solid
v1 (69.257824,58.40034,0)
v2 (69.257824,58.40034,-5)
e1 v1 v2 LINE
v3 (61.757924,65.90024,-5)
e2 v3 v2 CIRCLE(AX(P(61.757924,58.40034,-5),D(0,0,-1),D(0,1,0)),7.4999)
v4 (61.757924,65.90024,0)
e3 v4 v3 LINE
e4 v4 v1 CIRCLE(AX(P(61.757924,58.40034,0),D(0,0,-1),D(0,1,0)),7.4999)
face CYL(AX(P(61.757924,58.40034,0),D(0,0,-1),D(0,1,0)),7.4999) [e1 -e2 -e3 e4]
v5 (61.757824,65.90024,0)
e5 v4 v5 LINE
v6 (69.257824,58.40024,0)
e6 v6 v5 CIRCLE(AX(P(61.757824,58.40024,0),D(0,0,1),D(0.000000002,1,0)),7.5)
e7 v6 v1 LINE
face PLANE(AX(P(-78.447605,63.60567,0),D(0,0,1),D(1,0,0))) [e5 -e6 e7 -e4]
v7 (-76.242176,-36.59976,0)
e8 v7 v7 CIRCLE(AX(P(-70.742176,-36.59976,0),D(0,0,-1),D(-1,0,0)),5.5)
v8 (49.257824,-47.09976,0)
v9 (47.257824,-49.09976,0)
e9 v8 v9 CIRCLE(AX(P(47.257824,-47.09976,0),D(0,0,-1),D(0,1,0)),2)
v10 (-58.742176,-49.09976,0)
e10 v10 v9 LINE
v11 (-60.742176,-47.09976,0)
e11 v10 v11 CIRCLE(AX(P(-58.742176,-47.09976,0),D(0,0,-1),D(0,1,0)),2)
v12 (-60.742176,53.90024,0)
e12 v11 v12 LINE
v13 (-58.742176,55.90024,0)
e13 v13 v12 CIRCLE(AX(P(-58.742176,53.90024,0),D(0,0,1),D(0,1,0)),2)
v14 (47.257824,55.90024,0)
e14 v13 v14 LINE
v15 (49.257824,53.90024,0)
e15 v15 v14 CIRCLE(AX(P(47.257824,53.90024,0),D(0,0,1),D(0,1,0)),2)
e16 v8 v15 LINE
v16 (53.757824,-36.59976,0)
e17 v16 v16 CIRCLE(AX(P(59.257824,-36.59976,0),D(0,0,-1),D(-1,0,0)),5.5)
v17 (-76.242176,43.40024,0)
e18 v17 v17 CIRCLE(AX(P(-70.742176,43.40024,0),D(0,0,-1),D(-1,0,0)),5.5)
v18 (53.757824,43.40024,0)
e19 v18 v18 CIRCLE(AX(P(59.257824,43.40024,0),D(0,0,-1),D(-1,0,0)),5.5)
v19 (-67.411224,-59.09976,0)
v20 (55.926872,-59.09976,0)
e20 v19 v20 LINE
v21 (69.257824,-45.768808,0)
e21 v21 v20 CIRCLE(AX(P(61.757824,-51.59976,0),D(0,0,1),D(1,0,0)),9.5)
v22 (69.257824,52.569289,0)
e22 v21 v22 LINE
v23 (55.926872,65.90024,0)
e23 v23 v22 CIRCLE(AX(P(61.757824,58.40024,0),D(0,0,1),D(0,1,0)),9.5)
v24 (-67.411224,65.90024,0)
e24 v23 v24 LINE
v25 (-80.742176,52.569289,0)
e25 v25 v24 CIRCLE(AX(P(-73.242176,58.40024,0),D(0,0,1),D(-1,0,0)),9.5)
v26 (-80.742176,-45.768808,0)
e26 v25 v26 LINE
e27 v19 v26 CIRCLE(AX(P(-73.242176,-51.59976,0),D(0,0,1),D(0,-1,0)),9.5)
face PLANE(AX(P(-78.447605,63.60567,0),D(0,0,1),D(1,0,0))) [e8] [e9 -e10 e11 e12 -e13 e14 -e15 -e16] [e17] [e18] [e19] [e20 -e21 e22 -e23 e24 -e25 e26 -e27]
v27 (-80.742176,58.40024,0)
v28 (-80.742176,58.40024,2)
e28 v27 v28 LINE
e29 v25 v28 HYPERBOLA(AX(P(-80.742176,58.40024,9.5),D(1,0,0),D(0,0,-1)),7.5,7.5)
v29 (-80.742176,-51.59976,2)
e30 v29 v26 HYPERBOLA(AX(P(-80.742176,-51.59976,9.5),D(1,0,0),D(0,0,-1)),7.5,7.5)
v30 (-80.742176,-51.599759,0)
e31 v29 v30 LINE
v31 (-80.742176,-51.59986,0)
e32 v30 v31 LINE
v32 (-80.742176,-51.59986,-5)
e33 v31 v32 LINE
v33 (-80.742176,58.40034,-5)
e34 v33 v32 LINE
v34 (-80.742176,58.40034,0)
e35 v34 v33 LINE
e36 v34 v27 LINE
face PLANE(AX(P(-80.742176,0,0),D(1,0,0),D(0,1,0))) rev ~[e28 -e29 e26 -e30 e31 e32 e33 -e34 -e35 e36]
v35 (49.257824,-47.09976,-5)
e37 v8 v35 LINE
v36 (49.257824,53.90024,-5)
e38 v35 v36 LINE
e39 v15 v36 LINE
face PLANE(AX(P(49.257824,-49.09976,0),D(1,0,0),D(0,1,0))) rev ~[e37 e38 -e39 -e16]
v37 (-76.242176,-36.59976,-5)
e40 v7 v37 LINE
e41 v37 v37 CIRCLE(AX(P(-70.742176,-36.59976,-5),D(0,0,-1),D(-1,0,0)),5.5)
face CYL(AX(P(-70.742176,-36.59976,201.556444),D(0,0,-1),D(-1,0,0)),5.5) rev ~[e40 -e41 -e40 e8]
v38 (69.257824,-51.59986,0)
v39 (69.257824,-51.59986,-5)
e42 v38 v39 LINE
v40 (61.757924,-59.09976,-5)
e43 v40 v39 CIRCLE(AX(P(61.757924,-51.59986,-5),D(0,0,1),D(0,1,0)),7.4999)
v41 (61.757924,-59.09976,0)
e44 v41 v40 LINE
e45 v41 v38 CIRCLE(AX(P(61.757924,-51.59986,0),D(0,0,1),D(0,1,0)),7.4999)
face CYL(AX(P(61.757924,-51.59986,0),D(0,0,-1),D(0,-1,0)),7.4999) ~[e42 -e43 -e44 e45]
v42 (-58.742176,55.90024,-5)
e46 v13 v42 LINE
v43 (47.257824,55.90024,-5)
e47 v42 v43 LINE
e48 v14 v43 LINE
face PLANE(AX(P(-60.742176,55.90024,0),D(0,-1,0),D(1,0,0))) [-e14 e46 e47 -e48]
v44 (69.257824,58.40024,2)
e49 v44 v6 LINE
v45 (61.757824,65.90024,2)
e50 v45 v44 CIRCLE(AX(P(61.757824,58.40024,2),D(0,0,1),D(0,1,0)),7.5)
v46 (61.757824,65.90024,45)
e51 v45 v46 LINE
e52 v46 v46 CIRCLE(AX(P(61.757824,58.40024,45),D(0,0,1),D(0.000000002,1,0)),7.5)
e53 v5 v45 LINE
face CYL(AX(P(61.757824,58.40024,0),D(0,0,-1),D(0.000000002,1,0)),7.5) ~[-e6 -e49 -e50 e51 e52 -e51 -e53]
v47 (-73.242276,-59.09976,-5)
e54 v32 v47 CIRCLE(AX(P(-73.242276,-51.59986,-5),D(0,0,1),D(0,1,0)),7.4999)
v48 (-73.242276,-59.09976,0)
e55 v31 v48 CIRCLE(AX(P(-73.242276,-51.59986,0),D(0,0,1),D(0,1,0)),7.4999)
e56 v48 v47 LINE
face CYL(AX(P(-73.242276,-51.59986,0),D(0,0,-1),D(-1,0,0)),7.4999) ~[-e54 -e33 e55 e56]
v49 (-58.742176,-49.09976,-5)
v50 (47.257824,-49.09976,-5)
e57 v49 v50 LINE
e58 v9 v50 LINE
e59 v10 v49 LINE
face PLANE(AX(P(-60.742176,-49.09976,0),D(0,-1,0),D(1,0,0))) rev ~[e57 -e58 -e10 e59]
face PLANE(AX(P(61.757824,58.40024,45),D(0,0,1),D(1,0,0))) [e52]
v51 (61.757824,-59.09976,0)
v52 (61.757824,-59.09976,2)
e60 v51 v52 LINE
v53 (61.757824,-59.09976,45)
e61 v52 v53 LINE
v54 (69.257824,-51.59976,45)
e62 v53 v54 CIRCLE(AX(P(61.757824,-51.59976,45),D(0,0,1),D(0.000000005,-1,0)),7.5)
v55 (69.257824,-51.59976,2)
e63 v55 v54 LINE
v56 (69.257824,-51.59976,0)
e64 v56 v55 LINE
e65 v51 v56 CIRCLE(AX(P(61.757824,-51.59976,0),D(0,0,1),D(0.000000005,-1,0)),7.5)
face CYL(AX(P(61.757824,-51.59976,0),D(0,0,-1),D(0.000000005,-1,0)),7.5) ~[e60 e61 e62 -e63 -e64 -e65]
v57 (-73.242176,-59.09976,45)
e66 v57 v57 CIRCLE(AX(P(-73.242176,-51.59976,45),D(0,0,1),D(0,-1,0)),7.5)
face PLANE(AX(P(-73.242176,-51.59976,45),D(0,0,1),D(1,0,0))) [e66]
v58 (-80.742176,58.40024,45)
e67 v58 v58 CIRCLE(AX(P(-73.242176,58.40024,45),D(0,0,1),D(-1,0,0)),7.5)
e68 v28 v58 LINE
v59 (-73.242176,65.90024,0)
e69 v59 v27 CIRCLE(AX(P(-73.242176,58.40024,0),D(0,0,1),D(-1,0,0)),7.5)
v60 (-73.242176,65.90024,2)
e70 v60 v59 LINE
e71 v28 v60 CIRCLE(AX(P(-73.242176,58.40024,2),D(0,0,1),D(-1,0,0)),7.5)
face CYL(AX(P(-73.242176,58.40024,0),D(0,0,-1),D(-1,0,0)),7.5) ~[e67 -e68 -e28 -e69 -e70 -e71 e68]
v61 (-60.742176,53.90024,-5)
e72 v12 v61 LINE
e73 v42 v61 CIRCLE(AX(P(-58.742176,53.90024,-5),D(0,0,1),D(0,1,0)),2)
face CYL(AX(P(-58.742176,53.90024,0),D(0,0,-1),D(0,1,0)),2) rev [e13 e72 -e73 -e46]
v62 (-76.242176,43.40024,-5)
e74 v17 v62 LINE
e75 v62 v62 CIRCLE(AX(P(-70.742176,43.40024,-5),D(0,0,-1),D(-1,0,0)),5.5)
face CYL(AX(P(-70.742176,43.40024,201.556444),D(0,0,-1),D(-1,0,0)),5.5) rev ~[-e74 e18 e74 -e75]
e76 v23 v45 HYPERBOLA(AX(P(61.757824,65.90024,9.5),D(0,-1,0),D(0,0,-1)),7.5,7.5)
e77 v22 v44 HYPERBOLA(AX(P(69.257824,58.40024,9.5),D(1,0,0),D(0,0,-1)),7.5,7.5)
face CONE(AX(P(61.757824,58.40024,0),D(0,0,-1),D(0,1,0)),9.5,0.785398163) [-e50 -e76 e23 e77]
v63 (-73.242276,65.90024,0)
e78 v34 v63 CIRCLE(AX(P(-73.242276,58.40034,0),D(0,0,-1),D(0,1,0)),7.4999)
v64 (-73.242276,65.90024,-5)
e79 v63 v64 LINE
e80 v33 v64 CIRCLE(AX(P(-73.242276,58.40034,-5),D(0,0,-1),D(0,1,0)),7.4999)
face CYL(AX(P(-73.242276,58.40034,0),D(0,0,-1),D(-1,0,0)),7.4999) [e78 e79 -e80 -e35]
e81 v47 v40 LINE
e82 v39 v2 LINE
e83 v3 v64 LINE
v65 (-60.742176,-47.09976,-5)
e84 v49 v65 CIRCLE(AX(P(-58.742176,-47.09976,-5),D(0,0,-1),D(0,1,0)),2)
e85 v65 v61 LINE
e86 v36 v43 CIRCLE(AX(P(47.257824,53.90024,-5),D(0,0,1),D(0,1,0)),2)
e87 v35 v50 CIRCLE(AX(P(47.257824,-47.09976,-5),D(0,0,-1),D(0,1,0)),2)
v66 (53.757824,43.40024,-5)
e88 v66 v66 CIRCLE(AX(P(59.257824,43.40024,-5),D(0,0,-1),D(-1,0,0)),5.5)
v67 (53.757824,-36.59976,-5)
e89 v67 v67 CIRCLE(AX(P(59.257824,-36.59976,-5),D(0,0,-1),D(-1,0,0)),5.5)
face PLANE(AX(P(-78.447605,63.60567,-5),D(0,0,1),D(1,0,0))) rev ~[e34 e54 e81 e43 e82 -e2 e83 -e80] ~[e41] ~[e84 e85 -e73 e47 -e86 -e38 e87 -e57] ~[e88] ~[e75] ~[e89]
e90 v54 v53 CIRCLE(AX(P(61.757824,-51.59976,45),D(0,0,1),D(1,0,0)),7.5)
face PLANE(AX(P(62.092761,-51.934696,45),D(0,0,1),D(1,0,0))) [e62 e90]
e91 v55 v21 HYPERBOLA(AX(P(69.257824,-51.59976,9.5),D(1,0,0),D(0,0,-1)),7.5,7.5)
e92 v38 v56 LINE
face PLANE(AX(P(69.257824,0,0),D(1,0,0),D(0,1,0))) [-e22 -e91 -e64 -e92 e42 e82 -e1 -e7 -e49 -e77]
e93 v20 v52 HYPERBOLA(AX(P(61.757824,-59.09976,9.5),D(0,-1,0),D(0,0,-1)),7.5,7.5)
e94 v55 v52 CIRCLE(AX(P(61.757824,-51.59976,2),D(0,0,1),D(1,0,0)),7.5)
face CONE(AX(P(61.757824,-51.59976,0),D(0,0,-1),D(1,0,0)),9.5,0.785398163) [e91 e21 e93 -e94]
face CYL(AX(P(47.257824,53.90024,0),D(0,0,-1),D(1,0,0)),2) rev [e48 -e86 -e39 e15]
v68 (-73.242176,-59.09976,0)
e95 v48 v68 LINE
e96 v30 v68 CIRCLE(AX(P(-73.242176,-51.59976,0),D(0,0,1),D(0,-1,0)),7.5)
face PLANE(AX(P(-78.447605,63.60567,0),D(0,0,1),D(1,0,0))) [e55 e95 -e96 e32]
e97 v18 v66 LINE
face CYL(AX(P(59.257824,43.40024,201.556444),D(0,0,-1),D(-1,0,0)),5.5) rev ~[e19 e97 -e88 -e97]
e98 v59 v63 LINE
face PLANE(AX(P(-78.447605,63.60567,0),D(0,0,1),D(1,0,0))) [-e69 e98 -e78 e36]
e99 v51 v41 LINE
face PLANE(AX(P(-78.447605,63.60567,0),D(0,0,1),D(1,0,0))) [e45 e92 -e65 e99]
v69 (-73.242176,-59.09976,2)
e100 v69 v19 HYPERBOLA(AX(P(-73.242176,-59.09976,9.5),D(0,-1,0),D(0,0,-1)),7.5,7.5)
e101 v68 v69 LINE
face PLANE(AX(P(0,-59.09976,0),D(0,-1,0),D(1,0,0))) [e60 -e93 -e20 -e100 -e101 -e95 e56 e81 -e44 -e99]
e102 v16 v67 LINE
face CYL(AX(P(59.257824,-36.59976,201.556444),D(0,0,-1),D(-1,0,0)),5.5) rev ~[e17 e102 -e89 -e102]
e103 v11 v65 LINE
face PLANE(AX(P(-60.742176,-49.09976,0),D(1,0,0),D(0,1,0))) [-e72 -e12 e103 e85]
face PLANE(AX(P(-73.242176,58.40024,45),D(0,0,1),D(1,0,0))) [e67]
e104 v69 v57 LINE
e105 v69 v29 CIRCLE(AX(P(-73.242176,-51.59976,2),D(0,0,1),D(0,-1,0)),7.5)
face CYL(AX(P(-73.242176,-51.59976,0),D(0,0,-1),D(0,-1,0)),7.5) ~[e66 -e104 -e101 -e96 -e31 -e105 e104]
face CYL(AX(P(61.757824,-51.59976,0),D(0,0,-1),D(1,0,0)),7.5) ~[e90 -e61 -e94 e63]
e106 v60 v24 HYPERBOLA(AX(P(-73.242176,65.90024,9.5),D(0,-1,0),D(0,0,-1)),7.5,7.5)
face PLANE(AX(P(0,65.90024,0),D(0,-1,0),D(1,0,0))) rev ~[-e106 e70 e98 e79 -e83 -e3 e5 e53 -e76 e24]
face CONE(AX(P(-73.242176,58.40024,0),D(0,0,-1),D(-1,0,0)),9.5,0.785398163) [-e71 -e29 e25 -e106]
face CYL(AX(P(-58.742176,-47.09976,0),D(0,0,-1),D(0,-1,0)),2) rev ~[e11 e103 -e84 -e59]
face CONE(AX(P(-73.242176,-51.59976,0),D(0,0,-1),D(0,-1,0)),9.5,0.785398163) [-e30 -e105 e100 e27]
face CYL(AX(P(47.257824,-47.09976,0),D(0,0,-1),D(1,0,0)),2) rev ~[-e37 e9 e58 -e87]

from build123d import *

# Parameters (mm, degrees)
F0_W         = 110
F0_H         = 105
F1_DEPTH     = 5
F2_DEPTH     = 45
F3_D         = 11
F4_R         = 7.4999
F5_R         = 2
F6_T4_ANGLE  = 270.0000001091
F6_T10_ANGLE = 270
F6_T16_ANGLE = 269.9999994391
F6_T22_ANGLE = 270


# Not quite as in the source:
# - a fillet or chamfer that OpenCascade refuses, or shapes differently, is made with other operations: its cross-section is extruded or revolved along the edge and cut away or added
# - a fillet or chamfer is up to 0.001 mm smaller than in the source, because OpenCascade refuses the exact size


with BuildPart() as f1:
    # F0 (on Top) → F1 (new body)
    with BuildSketch(Plane.XY):
        with BuildLine():
            Line((-73.2421757894, 65.9002404553), (-80.7421757894, 65.9002404553))
            Line((-80.7421757894, 65.9002404553), (-80.7421757894, 58.4002404553))
            ThreePointArc((-80.7421757894, 58.4002404553), (-78.5454766483, 63.7035413142), (-73.2421757894, 65.9002404553))
        make_face()
        with BuildLine():
            Line((61.7578242249, 65.9002404553), (-73.2421757894, 65.9002404553))
            ThreePointArc((-73.2421757894, 65.9002404553), (-67.9388749305, 63.7035413142), (-65.7421757894, 58.4002404553))
            ThreePointArc((-65.7421757894, 58.4002404553), (-73.2421757894, 50.9002404553), (-80.7421757894, 58.4002404553))
            Line((-80.7421757894, 58.4002404553), (-80.7421757894, -51.5997595447))
            ThreePointArc((-80.7421757894, -51.5997595447), (-73.2421757894, -44.0997595447), (-65.7421757894, -51.5997595447))
            ThreePointArc((-65.7421757894, -51.5997595447), (-67.9388749305, -56.9030604036), (-73.2421757894, -59.0997595447))
            Line((-73.2421757894, -59.0997595447), (61.757824248, -59.0997595447))
            ThreePointArc((61.757824248, -59.0997595447), (56.4545233385, -46.296458699), (69.2578242106, -51.5997595447))
            Line((69.2578242106, -51.5997595447), (69.2578242106, 58.4002404553))
            ThreePointArc((69.2578242106, 58.4002404553), (56.4545233466, 53.0969396015), (61.7578242249, 65.9002404553))
        make_face()
        with Locations((-5.7421757894, 3.4002404553)):
            Rectangle(F0_W, F0_H, mode=Mode.SUBTRACT)
        with BuildLine():
            Line((69.2578242106, 65.9002404553), (61.7578242249, 65.9002404553))
            ThreePointArc((61.7578242249, 65.9002404553), (67.0611250745, 63.7035413092), (69.2578242106, 58.4002404553))
            Line((69.2578242106, 58.4002404553), (69.2578242106, 65.9002404553))
        make_face()
        with BuildLine():
            ThreePointArc((61.757824248, -59.0997595447), (67.0611250827, -56.9030603903), (69.2578242106, -51.5997595447))
            ThreePointArc((69.2578242106, -51.5997595447), (56.4545233385, -46.296458699), (61.757824248, -59.0997595447))
        make_face()
        with BuildLine():
            ThreePointArc((-65.7421757894, -51.5997595447), (-73.2421757894, -44.0997595447), (-80.7421757894, -51.5997595447))
            ThreePointArc((-80.7421757894, -51.5997595447), (-78.5454766483, -56.9030604036), (-73.2421757894, -59.0997595447))
            ThreePointArc((-73.2421757894, -59.0997595447), (-67.9388749305, -56.9030604036), (-65.7421757894, -51.5997595447))
        make_face()
        with BuildLine():
            ThreePointArc((69.2578242106, 58.4002404553), (67.0611250745, 63.7035413092), (61.7578242249, 65.9002404553))
            ThreePointArc((61.7578242249, 65.9002404553), (56.4545233466, 53.0969396015), (69.2578242106, 58.4002404553))
        make_face()
        with BuildLine():
            ThreePointArc((-65.7421757894, 58.4002404553), (-67.9388749305, 63.7035413142), (-73.2421757894, 65.9002404553))
            ThreePointArc((-73.2421757894, 65.9002404553), (-78.5454766483, 63.7035413142), (-80.7421757894, 58.4002404553))
            ThreePointArc((-80.7421757894, 58.4002404553), (-73.2421757894, 50.9002404553), (-65.7421757894, 58.4002404553))
        make_face()
        with BuildLine():
            ThreePointArc((-73.2421757894, -59.0997595447), (-78.5454766483, -56.9030604036), (-80.7421757894, -51.5997595447))
            Line((-80.7421757894, -51.5997595447), (-80.7421757894, -59.0997595447))
            Line((-80.7421757894, -59.0997595447), (-73.2421757894, -59.0997595447))
        make_face()
        with BuildLine():
            Line((69.2578242106, -59.0997595447), (69.2578242106, -51.5997595447))
            ThreePointArc((69.2578242106, -51.5997595447), (67.0611250827, -56.9030603903), (61.757824248, -59.0997595447))
            Line((61.757824248, -59.0997595447), (69.2578242106, -59.0997595447))
        make_face()
    extrude(amount=-F1_DEPTH)

    # F0 (on Top) → F2 (join)
    with BuildSketch(Plane.XY):
        with BuildLine():
            ThreePointArc((61.757824248, -59.0997595447), (67.0611250827, -56.9030603903), (69.2578242106, -51.5997595447))
            ThreePointArc((69.2578242106, -51.5997595447), (56.4545233385, -46.296458699), (61.757824248, -59.0997595447))
        make_face()
        with BuildLine():
            ThreePointArc((69.2578242106, 58.4002404553), (67.0611250745, 63.7035413092), (61.7578242249, 65.9002404553))
            ThreePointArc((61.7578242249, 65.9002404553), (56.4545233466, 53.0969396015), (69.2578242106, 58.4002404553))
        make_face()
        with BuildLine():
            ThreePointArc((-65.7421757894, -51.5997595447), (-73.2421757894, -44.0997595447), (-80.7421757894, -51.5997595447))
            ThreePointArc((-80.7421757894, -51.5997595447), (-78.5454766483, -56.9030604036), (-73.2421757894, -59.0997595447))
            ThreePointArc((-73.2421757894, -59.0997595447), (-67.9388749305, -56.9030604036), (-65.7421757894, -51.5997595447))
        make_face()
        with BuildLine():
            ThreePointArc((-65.7421757894, 58.4002404553), (-67.9388749305, 63.7035413142), (-73.2421757894, 65.9002404553))
            ThreePointArc((-73.2421757894, 65.9002404553), (-78.5454766483, 63.7035413142), (-80.7421757894, 58.4002404553))
            ThreePointArc((-80.7421757894, 58.4002404553), (-73.2421757894, 50.9002404553), (-65.7421757894, 58.4002404553))
        make_face()
    extrude(amount=F2_DEPTH)

    # F3 (through all)
    with Locations(Plane.XY):
        with Locations((-70.7421757894, 43.4002404553), (-70.7421757894, -36.5997595447), (59.2578242106, 43.4002404553), (59.2578242106, -36.5997595447)):
            Hole(F3_D / 2)

    # F4 (radius 7.5 in the source; OpenCascade refuses exactly that, so slightly less here)
    f4_edges = [f1.edges().sort_by_distance(p)[0] for p in [
        (69.257824, 65.90024, -2.5),
        (69.257824, -59.09976, -2.5),
        (-80.742176, -59.09976, -2.5),
        (-80.742176, 65.90024, -2.5),
    ]]
    fillet(f4_edges, radius=F4_R)

    # F5
    f5_edges = [f1.edges().sort_by_distance(p)[0] for p in [
        (-60.742176, 55.90024, -2.5),
        (49.257824, 55.90024, -2.5),
        (-60.742176, -49.09976, -2.5),
        (49.257824, -49.09976, -2.5),
    ]]
    fillet(f5_edges, radius=F5_R)

    # F6: chamfer of 2 on 4 edges, made by hand


with BuildPart() as f6_tool2:
    # F6_s3 → F6_t4 (revolve)
    with BuildSketch(Plane.YZ.offset(61.7578242106)):
        Polygon((67.9002404553, 0), (65.9002404553, 2), (65.9002404553, 0), align=None)
    revolve(axis=Axis((61.7578242106, 58.4002404553, 0), (0, 0, 1)), revolution_arc=F6_T4_ANGLE)

    split(bisect_by=Plane.XZ.offset(-65.9002404553), keep=Keep.TOP)

    split(bisect_by=Plane.YZ.offset(69.2578242106), keep=Keep.BOTTOM)


with BuildPart() as f1_1:
    add(f1.part)

    # F6_t1: union F6_tool2
    add(f6_tool2.part)


with BuildPart() as f6_tool8:
    # F6_s9 → F6_t10 (revolve)
    with BuildSketch(Plane.XZ.offset(-58.4002404553)):
        Polygon((-82.7421757894, 0), (-80.7421757894, 2), (-80.7421757894, 0), align=None)
    revolve(axis=Axis((-73.2421757894, 58.4002404553, 0), (0, 0, 1)), revolution_arc=F6_T10_ANGLE)

    split(bisect_by=Plane.YZ.offset(-80.7421757894), keep=Keep.TOP)

    split(bisect_by=Plane.XZ.offset(-65.9002404553), keep=Keep.TOP)


with BuildPart() as f1_2:
    add(f1_1.part)

    # F6_t7: union F6_tool8
    add(f6_tool8.part)


with BuildPart() as f6_tool14:
    # F6_s15 → F6_t16 (revolve)
    with BuildSketch(Plane.XZ.offset(51.5997595447)):
        Polygon((71.2578242106, 0), (69.2578242106, 2), (69.2578242106, 0), align=None)
    revolve(axis=Axis((61.7578242106, -51.5997595447, 0), (0, 0, 1)), revolution_arc=F6_T16_ANGLE)

    split(bisect_by=Plane.XZ.offset(59.0997595447), keep=Keep.BOTTOM)

    split(bisect_by=Plane.YZ.offset(69.2578242106), keep=Keep.BOTTOM)


with BuildPart() as f1_3:
    add(f1_2.part)

    # F6_t13: union F6_tool14
    add(f6_tool14.part)


with BuildPart() as f6_tool20:
    # F6_s21 → F6_t22 (revolve)
    with BuildSketch(Plane.YZ.offset(-73.2421757894)):
        Polygon((-61.0997595447, 0), (-59.0997595447, 2), (-59.0997595447, 0), align=None)
    revolve(axis=Axis((-73.2421757894, -51.5997595447, 0), (0, 0, 1)), revolution_arc=F6_T22_ANGLE)

    split(bisect_by=Plane.YZ.offset(-80.7421757894), keep=Keep.TOP)

    split(bisect_by=Plane.XZ.offset(59.0997595447), keep=Keep.BOTTOM)


with BuildPart() as f1_4:
    add(f1_3.part)

    # F6_t19: union F6_tool20
    add(f6_tool20.part)


solid = f1_4.part
